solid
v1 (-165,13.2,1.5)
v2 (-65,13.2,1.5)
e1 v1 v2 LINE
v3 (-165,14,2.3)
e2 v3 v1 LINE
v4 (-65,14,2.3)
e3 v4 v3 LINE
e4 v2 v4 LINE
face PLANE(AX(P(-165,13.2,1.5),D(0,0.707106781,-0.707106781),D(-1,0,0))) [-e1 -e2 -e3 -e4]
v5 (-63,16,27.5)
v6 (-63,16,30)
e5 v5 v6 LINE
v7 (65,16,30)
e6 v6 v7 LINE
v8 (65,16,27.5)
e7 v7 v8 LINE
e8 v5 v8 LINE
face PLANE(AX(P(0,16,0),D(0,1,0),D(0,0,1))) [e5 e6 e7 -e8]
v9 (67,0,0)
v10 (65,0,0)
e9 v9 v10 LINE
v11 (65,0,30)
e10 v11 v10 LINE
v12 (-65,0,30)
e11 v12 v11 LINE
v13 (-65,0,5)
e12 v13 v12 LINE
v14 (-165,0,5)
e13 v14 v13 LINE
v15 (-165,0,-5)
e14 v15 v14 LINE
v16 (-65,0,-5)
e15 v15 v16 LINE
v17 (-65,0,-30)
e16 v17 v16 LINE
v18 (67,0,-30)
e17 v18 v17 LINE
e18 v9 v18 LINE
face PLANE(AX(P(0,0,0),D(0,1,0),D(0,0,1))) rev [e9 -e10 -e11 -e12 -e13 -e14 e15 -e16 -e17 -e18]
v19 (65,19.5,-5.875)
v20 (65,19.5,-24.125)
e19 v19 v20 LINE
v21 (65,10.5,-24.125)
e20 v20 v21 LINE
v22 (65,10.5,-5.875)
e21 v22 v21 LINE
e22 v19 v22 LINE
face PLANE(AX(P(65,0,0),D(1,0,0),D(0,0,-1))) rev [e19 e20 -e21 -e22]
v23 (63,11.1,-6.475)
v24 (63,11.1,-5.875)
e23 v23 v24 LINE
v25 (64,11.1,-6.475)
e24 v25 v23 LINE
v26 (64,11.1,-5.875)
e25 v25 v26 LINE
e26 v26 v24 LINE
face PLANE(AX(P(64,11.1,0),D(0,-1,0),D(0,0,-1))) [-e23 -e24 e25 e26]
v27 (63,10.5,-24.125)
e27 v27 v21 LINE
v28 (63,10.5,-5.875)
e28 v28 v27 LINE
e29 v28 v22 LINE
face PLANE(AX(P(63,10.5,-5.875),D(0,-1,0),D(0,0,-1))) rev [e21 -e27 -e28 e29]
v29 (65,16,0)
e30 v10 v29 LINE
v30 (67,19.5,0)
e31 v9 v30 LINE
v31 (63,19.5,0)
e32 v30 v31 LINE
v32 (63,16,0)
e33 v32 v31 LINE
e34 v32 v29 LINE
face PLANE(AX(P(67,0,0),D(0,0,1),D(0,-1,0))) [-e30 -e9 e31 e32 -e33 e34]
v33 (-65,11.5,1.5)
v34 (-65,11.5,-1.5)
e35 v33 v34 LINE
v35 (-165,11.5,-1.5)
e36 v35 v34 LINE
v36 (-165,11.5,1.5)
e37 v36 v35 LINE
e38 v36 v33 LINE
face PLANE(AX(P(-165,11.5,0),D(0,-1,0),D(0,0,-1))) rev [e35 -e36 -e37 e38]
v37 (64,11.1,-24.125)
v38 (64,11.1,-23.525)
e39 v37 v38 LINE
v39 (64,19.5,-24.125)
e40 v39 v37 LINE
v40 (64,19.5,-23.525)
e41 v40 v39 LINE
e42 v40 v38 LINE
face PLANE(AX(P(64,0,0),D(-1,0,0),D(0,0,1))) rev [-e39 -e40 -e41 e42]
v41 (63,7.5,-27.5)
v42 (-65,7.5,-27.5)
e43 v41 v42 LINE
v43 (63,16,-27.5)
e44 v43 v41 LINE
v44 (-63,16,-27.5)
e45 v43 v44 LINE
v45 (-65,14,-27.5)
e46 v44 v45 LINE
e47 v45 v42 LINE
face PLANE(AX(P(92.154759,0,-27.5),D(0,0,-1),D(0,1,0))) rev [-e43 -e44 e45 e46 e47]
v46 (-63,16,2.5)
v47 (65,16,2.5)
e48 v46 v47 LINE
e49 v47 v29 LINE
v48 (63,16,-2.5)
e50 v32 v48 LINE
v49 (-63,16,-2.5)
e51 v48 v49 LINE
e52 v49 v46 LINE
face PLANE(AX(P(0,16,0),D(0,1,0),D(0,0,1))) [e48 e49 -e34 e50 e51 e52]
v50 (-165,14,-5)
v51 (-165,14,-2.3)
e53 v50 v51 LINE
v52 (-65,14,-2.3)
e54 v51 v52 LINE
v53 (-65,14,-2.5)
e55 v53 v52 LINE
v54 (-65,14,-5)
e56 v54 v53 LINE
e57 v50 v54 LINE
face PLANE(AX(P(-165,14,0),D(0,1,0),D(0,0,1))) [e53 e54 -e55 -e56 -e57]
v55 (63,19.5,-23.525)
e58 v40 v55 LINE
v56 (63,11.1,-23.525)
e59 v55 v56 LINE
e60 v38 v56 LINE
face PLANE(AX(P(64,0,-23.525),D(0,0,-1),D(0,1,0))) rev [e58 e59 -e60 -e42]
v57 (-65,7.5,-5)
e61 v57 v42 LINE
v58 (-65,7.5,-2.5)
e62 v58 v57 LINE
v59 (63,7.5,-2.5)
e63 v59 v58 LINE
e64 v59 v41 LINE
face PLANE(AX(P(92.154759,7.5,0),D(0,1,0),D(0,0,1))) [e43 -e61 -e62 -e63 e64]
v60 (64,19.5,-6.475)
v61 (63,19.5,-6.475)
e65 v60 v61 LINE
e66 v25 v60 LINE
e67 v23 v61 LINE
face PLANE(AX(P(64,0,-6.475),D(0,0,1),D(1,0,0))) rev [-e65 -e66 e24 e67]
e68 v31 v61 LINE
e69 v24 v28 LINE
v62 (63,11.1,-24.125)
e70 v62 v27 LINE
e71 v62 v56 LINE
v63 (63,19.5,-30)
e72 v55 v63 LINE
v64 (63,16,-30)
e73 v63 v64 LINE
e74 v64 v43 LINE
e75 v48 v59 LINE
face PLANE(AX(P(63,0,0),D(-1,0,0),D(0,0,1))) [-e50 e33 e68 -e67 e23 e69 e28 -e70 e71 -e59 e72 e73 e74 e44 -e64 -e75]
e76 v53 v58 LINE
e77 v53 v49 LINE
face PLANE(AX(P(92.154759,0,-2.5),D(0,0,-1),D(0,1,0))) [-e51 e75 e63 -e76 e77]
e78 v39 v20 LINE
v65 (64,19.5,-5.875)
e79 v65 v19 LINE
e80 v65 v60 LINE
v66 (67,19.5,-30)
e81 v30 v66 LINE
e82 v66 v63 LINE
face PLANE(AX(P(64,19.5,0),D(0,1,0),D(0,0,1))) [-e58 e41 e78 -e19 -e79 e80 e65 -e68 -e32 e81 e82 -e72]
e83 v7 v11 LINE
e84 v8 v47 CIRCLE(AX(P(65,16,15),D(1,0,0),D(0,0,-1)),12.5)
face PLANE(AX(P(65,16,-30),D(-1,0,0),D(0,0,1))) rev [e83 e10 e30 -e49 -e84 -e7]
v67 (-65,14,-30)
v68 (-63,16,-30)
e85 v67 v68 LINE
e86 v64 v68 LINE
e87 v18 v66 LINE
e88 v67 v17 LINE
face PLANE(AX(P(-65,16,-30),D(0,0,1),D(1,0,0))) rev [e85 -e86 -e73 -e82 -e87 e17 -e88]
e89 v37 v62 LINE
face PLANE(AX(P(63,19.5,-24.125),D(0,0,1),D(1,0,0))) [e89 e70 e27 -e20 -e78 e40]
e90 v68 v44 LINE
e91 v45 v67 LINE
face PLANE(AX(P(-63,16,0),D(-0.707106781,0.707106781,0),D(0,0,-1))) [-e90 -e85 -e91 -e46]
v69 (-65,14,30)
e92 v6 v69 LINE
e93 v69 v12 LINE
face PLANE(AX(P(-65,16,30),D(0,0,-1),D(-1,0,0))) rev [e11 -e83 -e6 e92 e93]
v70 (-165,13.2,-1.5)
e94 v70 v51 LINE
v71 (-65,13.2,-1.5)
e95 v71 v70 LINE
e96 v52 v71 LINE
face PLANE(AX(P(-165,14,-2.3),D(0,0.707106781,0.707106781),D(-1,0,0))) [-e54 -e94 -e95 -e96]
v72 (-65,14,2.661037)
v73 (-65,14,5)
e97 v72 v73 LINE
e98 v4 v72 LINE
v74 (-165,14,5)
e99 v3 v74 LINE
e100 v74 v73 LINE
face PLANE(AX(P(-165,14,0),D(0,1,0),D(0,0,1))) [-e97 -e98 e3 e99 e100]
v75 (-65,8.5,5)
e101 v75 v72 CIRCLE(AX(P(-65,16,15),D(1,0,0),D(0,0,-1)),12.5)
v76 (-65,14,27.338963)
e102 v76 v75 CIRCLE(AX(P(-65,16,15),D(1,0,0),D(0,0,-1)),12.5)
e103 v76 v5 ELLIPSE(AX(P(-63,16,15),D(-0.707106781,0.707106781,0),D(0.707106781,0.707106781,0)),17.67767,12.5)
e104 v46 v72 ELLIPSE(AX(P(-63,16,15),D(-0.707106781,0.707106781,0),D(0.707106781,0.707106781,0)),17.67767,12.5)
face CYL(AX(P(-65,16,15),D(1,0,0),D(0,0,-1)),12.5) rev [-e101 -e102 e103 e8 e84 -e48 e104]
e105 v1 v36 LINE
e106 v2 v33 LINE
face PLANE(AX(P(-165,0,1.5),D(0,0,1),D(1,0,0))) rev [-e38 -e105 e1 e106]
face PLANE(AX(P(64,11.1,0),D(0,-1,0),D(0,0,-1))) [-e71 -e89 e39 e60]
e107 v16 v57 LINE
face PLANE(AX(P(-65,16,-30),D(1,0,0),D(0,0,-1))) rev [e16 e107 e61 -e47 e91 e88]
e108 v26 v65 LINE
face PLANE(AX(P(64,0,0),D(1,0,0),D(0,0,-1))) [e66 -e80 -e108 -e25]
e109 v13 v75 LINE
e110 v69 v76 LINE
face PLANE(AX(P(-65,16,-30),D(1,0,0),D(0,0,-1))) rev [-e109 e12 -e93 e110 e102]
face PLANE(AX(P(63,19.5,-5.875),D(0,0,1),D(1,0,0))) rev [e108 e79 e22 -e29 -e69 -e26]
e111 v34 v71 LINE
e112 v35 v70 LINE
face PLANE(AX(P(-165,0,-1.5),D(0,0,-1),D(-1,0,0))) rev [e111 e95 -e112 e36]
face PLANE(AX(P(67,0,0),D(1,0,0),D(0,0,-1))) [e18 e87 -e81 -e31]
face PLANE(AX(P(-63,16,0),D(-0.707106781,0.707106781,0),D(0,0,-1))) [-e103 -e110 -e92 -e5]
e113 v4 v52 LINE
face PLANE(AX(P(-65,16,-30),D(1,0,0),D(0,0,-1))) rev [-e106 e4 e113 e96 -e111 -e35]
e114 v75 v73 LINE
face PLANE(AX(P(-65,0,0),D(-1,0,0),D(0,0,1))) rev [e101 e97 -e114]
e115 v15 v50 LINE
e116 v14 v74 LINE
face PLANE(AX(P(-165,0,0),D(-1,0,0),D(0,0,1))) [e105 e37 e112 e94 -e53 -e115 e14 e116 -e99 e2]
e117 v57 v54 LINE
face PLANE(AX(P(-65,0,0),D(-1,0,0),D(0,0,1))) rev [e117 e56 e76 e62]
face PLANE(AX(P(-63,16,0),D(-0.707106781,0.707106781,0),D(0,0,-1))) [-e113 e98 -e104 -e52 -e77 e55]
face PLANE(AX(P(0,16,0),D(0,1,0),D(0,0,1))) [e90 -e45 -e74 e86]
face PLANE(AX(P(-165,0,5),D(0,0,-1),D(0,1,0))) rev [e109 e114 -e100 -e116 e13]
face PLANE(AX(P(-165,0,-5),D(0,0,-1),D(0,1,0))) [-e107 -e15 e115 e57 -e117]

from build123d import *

# Parameters (mm, degrees)
SKETCH1_W            = 130
SKETCH1_H            = 60
BOSS_EXTRUDE1_DEPTH  = 16
CUT_EXTRUDE1_DEPTH   = 135.372616258
SKETCH3_W            = 18.25
SKETCH3_H            = 5.5
CUT_EXTRUDE2_DEPTH   = 2
BOSS_EXTRUDE2_START  = -2
SKETCH3_7_W          = 0.6
SKETCH3_7_H          = 4.9
SKETCH3_7_H_2        = 3.5
BOSS_EXTRUDE2_DEPTH  = 1
SKETCH3_9_W          = 5.875
SKETCH3_9_H          = 3.5
SKETCH3_9_W_2        = 0.6
SKETCH3_9_H_2        = 4.9
SKETCH3_9_W_3        = 17.05
SKETCH3_9_H_3        = 0.6
BOSS_EXTRUDE3_DEPTH  = 2
SKETCH3_10_W         = 5.875
SKETCH3_10_H         = 3.5
BOSS_EXTRUDE4_DEPTH  = 2
SKETCH4_W            = 25
SKETCH4_H            = 8.5
SKETCH4_H_2          = 6.5
CUT_EXTRUDE3_DEPTH   = 128
BOSS_EXTRUDE10_DEPTH = 100
CHAMFER1_SIZE        = 0.8
CHAMFER2_SIZE        = 2


with BuildPart() as part:
    # Sketch1 → Boss-Extrude1 (new body)
    with BuildSketch(Plane(origin=(0, 0, 0), x_dir=(1, 0, 0), z_dir=(0, 1, 0))):
        Rectangle(SKETCH1_W, SKETCH1_H)
    extrude(amount=BOSS_EXTRUDE1_DEPTH)

    # Sketch2 → Cut-Extrude1 (cut, through all)
    with BuildSketch(Plane(origin=(65, 0, 0), x_dir=(0, 0, -1), z_dir=(1, 0, 0))):
        with BuildLine():
            ThreePointArc((-27.5, 16), (-15, 3.5), (-2.5, 16))
            Line((-2.5, 16), (-27.5, 16))
        make_face()
        with BuildLine():
            Line((-27.5, 16), (-2.5, 16))
            ThreePointArc((-2.5, 16), (-15, 28.5), (-27.5, 16))
        make_face()
    extrude(amount=-CUT_EXTRUDE1_DEPTH, mode=Mode.SUBTRACT)

    # Sketch3 → Cut-Extrude2 (cut)
    with BuildSketch(Plane(origin=(65, 0, 0), x_dir=(0, 0, -1), z_dir=(1, 0, 0))):
        with Locations((15, 13.25)):
            Rectangle(SKETCH3_W, SKETCH3_H)
    extrude(amount=-CUT_EXTRUDE2_DEPTH, mode=Mode.SUBTRACT)

    # Sketch3<7> → Boss-Extrude2 (add)
    with BuildSketch(Plane(origin=(65, 0, 0), x_dir=(0, 0, -1), z_dir=(1, 0, 0)).offset(BOSS_EXTRUDE2_START)):
        with Locations((23.825, 13.55)):
            Rectangle(SKETCH3_7_W, SKETCH3_7_H)
        with Locations((23.825, 17.75)):
            Rectangle(SKETCH3_7_W, SKETCH3_7_H_2)
        with Locations((6.175, 17.75)):
            Rectangle(SKETCH3_7_W, SKETCH3_7_H_2)
        with Locations((6.175, 13.55)):
            Rectangle(SKETCH3_7_W, SKETCH3_7_H)
    extrude(amount=BOSS_EXTRUDE2_DEPTH)

    # Sketch3<9> → Boss-Extrude3 (add)
    with BuildSketch(Plane(origin=(65, 0, 0), x_dir=(0, 0, -1), z_dir=(1, 0, 0))):
        with Locations((2.9375, 17.75)):
            Rectangle(SKETCH3_9_W, SKETCH3_9_H)
        Polygon((0, 0), (30, 0), (30, 16), (24.125, 16), (24.125, 11.1), (24.125, 10.5), (23.525, 10.5), (6.475, 10.5), (5.875, 10.5), (5.875, 11.1), (5.875, 16), (0, 16), align=None)
        with Locations((6.175, 13.55)):
            Rectangle(SKETCH3_9_W_2, SKETCH3_9_H_2)
        with Locations((15, 13.55)):
            Rectangle(SKETCH3_9_W_3, SKETCH3_9_H_2)
        with Locations((6.175, 17.75)):
            Rectangle(SKETCH3_9_W_2, SKETCH3_9_H)
        with Locations((15, 17.75)):
            Rectangle(SKETCH3_9_W_3, SKETCH3_9_H)
        with Locations((15, 10.8)):
            Rectangle(SKETCH3_9_W_3, SKETCH3_9_H_3)
        with Locations((6.175, 10.8)):
            Rectangle(SKETCH3_9_W_2, SKETCH3_9_H_3)
        with Locations((23.825, 13.55)):
            Rectangle(SKETCH3_9_W_2, SKETCH3_9_H_2)
        with Locations((23.825, 10.8)):
            Rectangle(SKETCH3_9_W_2, SKETCH3_9_H_3)
        with Locations((23.825, 17.75)):
            Rectangle(SKETCH3_9_W_2, SKETCH3_9_H)
        with Locations((27.0625, 17.75)):
            Rectangle(SKETCH3_9_W, SKETCH3_9_H)
    extrude(amount=BOSS_EXTRUDE3_DEPTH)

    # Sketch3<10> → Boss-Extrude4 (add)
    with BuildSketch(Plane(origin=(65, 0, 0), x_dir=(0, 0, -1), z_dir=(1, 0, 0))):
        with Locations((2.9375, 17.75)):
            Rectangle(SKETCH3_10_W, SKETCH3_10_H)
        with Locations((27.0625, 17.75)):
            Rectangle(SKETCH3_10_W, SKETCH3_10_H)
    extrude(amount=-BOSS_EXTRUDE4_DEPTH)

    # Sketch4 → Cut-Extrude3 (cut)
    with BuildSketch(Plane.ZY.offset(65)):
        with Locations((-15, 11.75)):
            Rectangle(SKETCH4_W, SKETCH4_H)
        with Locations((-15, 19.25)):
            Rectangle(SKETCH4_W, SKETCH4_H_2)
    extrude(amount=-CUT_EXTRUDE3_DEPTH, mode=Mode.SUBTRACT)

    # Sketch5 → Boss-Extrude10 (add)
    with BuildSketch(Plane.ZY.offset(65)):
        Polygon((1.5, 14), (1.5, 11.5), (-1.5, 11.5), (-1.5, 14), (-5, 14), (-5, 0), (5, 0), (5, 14), align=None)
    extrude(amount=BOSS_EXTRUDE10_DEPTH)

    # Chamfer1
    chamfer1_edges = [part.edges().sort_by_distance(p)[0] for p in [
        (-115, 14, -1.5),
        (-115, 14, 1.5),
    ]]
    chamfer(chamfer1_edges, length=CHAMFER1_SIZE)

    # Chamfer2
    chamfer2_edges = [part.edges().sort_by_distance(p)[0] for p in [
        (-65, 16, -28.75),
        (-65, 16, 28.75),
        (-65, 16, 0),
    ]]
    chamfer(chamfer2_edges, length=CHAMFER2_SIZE - 0.0001)  # a hair under: the kernel refuses the full size


solid = part.part
